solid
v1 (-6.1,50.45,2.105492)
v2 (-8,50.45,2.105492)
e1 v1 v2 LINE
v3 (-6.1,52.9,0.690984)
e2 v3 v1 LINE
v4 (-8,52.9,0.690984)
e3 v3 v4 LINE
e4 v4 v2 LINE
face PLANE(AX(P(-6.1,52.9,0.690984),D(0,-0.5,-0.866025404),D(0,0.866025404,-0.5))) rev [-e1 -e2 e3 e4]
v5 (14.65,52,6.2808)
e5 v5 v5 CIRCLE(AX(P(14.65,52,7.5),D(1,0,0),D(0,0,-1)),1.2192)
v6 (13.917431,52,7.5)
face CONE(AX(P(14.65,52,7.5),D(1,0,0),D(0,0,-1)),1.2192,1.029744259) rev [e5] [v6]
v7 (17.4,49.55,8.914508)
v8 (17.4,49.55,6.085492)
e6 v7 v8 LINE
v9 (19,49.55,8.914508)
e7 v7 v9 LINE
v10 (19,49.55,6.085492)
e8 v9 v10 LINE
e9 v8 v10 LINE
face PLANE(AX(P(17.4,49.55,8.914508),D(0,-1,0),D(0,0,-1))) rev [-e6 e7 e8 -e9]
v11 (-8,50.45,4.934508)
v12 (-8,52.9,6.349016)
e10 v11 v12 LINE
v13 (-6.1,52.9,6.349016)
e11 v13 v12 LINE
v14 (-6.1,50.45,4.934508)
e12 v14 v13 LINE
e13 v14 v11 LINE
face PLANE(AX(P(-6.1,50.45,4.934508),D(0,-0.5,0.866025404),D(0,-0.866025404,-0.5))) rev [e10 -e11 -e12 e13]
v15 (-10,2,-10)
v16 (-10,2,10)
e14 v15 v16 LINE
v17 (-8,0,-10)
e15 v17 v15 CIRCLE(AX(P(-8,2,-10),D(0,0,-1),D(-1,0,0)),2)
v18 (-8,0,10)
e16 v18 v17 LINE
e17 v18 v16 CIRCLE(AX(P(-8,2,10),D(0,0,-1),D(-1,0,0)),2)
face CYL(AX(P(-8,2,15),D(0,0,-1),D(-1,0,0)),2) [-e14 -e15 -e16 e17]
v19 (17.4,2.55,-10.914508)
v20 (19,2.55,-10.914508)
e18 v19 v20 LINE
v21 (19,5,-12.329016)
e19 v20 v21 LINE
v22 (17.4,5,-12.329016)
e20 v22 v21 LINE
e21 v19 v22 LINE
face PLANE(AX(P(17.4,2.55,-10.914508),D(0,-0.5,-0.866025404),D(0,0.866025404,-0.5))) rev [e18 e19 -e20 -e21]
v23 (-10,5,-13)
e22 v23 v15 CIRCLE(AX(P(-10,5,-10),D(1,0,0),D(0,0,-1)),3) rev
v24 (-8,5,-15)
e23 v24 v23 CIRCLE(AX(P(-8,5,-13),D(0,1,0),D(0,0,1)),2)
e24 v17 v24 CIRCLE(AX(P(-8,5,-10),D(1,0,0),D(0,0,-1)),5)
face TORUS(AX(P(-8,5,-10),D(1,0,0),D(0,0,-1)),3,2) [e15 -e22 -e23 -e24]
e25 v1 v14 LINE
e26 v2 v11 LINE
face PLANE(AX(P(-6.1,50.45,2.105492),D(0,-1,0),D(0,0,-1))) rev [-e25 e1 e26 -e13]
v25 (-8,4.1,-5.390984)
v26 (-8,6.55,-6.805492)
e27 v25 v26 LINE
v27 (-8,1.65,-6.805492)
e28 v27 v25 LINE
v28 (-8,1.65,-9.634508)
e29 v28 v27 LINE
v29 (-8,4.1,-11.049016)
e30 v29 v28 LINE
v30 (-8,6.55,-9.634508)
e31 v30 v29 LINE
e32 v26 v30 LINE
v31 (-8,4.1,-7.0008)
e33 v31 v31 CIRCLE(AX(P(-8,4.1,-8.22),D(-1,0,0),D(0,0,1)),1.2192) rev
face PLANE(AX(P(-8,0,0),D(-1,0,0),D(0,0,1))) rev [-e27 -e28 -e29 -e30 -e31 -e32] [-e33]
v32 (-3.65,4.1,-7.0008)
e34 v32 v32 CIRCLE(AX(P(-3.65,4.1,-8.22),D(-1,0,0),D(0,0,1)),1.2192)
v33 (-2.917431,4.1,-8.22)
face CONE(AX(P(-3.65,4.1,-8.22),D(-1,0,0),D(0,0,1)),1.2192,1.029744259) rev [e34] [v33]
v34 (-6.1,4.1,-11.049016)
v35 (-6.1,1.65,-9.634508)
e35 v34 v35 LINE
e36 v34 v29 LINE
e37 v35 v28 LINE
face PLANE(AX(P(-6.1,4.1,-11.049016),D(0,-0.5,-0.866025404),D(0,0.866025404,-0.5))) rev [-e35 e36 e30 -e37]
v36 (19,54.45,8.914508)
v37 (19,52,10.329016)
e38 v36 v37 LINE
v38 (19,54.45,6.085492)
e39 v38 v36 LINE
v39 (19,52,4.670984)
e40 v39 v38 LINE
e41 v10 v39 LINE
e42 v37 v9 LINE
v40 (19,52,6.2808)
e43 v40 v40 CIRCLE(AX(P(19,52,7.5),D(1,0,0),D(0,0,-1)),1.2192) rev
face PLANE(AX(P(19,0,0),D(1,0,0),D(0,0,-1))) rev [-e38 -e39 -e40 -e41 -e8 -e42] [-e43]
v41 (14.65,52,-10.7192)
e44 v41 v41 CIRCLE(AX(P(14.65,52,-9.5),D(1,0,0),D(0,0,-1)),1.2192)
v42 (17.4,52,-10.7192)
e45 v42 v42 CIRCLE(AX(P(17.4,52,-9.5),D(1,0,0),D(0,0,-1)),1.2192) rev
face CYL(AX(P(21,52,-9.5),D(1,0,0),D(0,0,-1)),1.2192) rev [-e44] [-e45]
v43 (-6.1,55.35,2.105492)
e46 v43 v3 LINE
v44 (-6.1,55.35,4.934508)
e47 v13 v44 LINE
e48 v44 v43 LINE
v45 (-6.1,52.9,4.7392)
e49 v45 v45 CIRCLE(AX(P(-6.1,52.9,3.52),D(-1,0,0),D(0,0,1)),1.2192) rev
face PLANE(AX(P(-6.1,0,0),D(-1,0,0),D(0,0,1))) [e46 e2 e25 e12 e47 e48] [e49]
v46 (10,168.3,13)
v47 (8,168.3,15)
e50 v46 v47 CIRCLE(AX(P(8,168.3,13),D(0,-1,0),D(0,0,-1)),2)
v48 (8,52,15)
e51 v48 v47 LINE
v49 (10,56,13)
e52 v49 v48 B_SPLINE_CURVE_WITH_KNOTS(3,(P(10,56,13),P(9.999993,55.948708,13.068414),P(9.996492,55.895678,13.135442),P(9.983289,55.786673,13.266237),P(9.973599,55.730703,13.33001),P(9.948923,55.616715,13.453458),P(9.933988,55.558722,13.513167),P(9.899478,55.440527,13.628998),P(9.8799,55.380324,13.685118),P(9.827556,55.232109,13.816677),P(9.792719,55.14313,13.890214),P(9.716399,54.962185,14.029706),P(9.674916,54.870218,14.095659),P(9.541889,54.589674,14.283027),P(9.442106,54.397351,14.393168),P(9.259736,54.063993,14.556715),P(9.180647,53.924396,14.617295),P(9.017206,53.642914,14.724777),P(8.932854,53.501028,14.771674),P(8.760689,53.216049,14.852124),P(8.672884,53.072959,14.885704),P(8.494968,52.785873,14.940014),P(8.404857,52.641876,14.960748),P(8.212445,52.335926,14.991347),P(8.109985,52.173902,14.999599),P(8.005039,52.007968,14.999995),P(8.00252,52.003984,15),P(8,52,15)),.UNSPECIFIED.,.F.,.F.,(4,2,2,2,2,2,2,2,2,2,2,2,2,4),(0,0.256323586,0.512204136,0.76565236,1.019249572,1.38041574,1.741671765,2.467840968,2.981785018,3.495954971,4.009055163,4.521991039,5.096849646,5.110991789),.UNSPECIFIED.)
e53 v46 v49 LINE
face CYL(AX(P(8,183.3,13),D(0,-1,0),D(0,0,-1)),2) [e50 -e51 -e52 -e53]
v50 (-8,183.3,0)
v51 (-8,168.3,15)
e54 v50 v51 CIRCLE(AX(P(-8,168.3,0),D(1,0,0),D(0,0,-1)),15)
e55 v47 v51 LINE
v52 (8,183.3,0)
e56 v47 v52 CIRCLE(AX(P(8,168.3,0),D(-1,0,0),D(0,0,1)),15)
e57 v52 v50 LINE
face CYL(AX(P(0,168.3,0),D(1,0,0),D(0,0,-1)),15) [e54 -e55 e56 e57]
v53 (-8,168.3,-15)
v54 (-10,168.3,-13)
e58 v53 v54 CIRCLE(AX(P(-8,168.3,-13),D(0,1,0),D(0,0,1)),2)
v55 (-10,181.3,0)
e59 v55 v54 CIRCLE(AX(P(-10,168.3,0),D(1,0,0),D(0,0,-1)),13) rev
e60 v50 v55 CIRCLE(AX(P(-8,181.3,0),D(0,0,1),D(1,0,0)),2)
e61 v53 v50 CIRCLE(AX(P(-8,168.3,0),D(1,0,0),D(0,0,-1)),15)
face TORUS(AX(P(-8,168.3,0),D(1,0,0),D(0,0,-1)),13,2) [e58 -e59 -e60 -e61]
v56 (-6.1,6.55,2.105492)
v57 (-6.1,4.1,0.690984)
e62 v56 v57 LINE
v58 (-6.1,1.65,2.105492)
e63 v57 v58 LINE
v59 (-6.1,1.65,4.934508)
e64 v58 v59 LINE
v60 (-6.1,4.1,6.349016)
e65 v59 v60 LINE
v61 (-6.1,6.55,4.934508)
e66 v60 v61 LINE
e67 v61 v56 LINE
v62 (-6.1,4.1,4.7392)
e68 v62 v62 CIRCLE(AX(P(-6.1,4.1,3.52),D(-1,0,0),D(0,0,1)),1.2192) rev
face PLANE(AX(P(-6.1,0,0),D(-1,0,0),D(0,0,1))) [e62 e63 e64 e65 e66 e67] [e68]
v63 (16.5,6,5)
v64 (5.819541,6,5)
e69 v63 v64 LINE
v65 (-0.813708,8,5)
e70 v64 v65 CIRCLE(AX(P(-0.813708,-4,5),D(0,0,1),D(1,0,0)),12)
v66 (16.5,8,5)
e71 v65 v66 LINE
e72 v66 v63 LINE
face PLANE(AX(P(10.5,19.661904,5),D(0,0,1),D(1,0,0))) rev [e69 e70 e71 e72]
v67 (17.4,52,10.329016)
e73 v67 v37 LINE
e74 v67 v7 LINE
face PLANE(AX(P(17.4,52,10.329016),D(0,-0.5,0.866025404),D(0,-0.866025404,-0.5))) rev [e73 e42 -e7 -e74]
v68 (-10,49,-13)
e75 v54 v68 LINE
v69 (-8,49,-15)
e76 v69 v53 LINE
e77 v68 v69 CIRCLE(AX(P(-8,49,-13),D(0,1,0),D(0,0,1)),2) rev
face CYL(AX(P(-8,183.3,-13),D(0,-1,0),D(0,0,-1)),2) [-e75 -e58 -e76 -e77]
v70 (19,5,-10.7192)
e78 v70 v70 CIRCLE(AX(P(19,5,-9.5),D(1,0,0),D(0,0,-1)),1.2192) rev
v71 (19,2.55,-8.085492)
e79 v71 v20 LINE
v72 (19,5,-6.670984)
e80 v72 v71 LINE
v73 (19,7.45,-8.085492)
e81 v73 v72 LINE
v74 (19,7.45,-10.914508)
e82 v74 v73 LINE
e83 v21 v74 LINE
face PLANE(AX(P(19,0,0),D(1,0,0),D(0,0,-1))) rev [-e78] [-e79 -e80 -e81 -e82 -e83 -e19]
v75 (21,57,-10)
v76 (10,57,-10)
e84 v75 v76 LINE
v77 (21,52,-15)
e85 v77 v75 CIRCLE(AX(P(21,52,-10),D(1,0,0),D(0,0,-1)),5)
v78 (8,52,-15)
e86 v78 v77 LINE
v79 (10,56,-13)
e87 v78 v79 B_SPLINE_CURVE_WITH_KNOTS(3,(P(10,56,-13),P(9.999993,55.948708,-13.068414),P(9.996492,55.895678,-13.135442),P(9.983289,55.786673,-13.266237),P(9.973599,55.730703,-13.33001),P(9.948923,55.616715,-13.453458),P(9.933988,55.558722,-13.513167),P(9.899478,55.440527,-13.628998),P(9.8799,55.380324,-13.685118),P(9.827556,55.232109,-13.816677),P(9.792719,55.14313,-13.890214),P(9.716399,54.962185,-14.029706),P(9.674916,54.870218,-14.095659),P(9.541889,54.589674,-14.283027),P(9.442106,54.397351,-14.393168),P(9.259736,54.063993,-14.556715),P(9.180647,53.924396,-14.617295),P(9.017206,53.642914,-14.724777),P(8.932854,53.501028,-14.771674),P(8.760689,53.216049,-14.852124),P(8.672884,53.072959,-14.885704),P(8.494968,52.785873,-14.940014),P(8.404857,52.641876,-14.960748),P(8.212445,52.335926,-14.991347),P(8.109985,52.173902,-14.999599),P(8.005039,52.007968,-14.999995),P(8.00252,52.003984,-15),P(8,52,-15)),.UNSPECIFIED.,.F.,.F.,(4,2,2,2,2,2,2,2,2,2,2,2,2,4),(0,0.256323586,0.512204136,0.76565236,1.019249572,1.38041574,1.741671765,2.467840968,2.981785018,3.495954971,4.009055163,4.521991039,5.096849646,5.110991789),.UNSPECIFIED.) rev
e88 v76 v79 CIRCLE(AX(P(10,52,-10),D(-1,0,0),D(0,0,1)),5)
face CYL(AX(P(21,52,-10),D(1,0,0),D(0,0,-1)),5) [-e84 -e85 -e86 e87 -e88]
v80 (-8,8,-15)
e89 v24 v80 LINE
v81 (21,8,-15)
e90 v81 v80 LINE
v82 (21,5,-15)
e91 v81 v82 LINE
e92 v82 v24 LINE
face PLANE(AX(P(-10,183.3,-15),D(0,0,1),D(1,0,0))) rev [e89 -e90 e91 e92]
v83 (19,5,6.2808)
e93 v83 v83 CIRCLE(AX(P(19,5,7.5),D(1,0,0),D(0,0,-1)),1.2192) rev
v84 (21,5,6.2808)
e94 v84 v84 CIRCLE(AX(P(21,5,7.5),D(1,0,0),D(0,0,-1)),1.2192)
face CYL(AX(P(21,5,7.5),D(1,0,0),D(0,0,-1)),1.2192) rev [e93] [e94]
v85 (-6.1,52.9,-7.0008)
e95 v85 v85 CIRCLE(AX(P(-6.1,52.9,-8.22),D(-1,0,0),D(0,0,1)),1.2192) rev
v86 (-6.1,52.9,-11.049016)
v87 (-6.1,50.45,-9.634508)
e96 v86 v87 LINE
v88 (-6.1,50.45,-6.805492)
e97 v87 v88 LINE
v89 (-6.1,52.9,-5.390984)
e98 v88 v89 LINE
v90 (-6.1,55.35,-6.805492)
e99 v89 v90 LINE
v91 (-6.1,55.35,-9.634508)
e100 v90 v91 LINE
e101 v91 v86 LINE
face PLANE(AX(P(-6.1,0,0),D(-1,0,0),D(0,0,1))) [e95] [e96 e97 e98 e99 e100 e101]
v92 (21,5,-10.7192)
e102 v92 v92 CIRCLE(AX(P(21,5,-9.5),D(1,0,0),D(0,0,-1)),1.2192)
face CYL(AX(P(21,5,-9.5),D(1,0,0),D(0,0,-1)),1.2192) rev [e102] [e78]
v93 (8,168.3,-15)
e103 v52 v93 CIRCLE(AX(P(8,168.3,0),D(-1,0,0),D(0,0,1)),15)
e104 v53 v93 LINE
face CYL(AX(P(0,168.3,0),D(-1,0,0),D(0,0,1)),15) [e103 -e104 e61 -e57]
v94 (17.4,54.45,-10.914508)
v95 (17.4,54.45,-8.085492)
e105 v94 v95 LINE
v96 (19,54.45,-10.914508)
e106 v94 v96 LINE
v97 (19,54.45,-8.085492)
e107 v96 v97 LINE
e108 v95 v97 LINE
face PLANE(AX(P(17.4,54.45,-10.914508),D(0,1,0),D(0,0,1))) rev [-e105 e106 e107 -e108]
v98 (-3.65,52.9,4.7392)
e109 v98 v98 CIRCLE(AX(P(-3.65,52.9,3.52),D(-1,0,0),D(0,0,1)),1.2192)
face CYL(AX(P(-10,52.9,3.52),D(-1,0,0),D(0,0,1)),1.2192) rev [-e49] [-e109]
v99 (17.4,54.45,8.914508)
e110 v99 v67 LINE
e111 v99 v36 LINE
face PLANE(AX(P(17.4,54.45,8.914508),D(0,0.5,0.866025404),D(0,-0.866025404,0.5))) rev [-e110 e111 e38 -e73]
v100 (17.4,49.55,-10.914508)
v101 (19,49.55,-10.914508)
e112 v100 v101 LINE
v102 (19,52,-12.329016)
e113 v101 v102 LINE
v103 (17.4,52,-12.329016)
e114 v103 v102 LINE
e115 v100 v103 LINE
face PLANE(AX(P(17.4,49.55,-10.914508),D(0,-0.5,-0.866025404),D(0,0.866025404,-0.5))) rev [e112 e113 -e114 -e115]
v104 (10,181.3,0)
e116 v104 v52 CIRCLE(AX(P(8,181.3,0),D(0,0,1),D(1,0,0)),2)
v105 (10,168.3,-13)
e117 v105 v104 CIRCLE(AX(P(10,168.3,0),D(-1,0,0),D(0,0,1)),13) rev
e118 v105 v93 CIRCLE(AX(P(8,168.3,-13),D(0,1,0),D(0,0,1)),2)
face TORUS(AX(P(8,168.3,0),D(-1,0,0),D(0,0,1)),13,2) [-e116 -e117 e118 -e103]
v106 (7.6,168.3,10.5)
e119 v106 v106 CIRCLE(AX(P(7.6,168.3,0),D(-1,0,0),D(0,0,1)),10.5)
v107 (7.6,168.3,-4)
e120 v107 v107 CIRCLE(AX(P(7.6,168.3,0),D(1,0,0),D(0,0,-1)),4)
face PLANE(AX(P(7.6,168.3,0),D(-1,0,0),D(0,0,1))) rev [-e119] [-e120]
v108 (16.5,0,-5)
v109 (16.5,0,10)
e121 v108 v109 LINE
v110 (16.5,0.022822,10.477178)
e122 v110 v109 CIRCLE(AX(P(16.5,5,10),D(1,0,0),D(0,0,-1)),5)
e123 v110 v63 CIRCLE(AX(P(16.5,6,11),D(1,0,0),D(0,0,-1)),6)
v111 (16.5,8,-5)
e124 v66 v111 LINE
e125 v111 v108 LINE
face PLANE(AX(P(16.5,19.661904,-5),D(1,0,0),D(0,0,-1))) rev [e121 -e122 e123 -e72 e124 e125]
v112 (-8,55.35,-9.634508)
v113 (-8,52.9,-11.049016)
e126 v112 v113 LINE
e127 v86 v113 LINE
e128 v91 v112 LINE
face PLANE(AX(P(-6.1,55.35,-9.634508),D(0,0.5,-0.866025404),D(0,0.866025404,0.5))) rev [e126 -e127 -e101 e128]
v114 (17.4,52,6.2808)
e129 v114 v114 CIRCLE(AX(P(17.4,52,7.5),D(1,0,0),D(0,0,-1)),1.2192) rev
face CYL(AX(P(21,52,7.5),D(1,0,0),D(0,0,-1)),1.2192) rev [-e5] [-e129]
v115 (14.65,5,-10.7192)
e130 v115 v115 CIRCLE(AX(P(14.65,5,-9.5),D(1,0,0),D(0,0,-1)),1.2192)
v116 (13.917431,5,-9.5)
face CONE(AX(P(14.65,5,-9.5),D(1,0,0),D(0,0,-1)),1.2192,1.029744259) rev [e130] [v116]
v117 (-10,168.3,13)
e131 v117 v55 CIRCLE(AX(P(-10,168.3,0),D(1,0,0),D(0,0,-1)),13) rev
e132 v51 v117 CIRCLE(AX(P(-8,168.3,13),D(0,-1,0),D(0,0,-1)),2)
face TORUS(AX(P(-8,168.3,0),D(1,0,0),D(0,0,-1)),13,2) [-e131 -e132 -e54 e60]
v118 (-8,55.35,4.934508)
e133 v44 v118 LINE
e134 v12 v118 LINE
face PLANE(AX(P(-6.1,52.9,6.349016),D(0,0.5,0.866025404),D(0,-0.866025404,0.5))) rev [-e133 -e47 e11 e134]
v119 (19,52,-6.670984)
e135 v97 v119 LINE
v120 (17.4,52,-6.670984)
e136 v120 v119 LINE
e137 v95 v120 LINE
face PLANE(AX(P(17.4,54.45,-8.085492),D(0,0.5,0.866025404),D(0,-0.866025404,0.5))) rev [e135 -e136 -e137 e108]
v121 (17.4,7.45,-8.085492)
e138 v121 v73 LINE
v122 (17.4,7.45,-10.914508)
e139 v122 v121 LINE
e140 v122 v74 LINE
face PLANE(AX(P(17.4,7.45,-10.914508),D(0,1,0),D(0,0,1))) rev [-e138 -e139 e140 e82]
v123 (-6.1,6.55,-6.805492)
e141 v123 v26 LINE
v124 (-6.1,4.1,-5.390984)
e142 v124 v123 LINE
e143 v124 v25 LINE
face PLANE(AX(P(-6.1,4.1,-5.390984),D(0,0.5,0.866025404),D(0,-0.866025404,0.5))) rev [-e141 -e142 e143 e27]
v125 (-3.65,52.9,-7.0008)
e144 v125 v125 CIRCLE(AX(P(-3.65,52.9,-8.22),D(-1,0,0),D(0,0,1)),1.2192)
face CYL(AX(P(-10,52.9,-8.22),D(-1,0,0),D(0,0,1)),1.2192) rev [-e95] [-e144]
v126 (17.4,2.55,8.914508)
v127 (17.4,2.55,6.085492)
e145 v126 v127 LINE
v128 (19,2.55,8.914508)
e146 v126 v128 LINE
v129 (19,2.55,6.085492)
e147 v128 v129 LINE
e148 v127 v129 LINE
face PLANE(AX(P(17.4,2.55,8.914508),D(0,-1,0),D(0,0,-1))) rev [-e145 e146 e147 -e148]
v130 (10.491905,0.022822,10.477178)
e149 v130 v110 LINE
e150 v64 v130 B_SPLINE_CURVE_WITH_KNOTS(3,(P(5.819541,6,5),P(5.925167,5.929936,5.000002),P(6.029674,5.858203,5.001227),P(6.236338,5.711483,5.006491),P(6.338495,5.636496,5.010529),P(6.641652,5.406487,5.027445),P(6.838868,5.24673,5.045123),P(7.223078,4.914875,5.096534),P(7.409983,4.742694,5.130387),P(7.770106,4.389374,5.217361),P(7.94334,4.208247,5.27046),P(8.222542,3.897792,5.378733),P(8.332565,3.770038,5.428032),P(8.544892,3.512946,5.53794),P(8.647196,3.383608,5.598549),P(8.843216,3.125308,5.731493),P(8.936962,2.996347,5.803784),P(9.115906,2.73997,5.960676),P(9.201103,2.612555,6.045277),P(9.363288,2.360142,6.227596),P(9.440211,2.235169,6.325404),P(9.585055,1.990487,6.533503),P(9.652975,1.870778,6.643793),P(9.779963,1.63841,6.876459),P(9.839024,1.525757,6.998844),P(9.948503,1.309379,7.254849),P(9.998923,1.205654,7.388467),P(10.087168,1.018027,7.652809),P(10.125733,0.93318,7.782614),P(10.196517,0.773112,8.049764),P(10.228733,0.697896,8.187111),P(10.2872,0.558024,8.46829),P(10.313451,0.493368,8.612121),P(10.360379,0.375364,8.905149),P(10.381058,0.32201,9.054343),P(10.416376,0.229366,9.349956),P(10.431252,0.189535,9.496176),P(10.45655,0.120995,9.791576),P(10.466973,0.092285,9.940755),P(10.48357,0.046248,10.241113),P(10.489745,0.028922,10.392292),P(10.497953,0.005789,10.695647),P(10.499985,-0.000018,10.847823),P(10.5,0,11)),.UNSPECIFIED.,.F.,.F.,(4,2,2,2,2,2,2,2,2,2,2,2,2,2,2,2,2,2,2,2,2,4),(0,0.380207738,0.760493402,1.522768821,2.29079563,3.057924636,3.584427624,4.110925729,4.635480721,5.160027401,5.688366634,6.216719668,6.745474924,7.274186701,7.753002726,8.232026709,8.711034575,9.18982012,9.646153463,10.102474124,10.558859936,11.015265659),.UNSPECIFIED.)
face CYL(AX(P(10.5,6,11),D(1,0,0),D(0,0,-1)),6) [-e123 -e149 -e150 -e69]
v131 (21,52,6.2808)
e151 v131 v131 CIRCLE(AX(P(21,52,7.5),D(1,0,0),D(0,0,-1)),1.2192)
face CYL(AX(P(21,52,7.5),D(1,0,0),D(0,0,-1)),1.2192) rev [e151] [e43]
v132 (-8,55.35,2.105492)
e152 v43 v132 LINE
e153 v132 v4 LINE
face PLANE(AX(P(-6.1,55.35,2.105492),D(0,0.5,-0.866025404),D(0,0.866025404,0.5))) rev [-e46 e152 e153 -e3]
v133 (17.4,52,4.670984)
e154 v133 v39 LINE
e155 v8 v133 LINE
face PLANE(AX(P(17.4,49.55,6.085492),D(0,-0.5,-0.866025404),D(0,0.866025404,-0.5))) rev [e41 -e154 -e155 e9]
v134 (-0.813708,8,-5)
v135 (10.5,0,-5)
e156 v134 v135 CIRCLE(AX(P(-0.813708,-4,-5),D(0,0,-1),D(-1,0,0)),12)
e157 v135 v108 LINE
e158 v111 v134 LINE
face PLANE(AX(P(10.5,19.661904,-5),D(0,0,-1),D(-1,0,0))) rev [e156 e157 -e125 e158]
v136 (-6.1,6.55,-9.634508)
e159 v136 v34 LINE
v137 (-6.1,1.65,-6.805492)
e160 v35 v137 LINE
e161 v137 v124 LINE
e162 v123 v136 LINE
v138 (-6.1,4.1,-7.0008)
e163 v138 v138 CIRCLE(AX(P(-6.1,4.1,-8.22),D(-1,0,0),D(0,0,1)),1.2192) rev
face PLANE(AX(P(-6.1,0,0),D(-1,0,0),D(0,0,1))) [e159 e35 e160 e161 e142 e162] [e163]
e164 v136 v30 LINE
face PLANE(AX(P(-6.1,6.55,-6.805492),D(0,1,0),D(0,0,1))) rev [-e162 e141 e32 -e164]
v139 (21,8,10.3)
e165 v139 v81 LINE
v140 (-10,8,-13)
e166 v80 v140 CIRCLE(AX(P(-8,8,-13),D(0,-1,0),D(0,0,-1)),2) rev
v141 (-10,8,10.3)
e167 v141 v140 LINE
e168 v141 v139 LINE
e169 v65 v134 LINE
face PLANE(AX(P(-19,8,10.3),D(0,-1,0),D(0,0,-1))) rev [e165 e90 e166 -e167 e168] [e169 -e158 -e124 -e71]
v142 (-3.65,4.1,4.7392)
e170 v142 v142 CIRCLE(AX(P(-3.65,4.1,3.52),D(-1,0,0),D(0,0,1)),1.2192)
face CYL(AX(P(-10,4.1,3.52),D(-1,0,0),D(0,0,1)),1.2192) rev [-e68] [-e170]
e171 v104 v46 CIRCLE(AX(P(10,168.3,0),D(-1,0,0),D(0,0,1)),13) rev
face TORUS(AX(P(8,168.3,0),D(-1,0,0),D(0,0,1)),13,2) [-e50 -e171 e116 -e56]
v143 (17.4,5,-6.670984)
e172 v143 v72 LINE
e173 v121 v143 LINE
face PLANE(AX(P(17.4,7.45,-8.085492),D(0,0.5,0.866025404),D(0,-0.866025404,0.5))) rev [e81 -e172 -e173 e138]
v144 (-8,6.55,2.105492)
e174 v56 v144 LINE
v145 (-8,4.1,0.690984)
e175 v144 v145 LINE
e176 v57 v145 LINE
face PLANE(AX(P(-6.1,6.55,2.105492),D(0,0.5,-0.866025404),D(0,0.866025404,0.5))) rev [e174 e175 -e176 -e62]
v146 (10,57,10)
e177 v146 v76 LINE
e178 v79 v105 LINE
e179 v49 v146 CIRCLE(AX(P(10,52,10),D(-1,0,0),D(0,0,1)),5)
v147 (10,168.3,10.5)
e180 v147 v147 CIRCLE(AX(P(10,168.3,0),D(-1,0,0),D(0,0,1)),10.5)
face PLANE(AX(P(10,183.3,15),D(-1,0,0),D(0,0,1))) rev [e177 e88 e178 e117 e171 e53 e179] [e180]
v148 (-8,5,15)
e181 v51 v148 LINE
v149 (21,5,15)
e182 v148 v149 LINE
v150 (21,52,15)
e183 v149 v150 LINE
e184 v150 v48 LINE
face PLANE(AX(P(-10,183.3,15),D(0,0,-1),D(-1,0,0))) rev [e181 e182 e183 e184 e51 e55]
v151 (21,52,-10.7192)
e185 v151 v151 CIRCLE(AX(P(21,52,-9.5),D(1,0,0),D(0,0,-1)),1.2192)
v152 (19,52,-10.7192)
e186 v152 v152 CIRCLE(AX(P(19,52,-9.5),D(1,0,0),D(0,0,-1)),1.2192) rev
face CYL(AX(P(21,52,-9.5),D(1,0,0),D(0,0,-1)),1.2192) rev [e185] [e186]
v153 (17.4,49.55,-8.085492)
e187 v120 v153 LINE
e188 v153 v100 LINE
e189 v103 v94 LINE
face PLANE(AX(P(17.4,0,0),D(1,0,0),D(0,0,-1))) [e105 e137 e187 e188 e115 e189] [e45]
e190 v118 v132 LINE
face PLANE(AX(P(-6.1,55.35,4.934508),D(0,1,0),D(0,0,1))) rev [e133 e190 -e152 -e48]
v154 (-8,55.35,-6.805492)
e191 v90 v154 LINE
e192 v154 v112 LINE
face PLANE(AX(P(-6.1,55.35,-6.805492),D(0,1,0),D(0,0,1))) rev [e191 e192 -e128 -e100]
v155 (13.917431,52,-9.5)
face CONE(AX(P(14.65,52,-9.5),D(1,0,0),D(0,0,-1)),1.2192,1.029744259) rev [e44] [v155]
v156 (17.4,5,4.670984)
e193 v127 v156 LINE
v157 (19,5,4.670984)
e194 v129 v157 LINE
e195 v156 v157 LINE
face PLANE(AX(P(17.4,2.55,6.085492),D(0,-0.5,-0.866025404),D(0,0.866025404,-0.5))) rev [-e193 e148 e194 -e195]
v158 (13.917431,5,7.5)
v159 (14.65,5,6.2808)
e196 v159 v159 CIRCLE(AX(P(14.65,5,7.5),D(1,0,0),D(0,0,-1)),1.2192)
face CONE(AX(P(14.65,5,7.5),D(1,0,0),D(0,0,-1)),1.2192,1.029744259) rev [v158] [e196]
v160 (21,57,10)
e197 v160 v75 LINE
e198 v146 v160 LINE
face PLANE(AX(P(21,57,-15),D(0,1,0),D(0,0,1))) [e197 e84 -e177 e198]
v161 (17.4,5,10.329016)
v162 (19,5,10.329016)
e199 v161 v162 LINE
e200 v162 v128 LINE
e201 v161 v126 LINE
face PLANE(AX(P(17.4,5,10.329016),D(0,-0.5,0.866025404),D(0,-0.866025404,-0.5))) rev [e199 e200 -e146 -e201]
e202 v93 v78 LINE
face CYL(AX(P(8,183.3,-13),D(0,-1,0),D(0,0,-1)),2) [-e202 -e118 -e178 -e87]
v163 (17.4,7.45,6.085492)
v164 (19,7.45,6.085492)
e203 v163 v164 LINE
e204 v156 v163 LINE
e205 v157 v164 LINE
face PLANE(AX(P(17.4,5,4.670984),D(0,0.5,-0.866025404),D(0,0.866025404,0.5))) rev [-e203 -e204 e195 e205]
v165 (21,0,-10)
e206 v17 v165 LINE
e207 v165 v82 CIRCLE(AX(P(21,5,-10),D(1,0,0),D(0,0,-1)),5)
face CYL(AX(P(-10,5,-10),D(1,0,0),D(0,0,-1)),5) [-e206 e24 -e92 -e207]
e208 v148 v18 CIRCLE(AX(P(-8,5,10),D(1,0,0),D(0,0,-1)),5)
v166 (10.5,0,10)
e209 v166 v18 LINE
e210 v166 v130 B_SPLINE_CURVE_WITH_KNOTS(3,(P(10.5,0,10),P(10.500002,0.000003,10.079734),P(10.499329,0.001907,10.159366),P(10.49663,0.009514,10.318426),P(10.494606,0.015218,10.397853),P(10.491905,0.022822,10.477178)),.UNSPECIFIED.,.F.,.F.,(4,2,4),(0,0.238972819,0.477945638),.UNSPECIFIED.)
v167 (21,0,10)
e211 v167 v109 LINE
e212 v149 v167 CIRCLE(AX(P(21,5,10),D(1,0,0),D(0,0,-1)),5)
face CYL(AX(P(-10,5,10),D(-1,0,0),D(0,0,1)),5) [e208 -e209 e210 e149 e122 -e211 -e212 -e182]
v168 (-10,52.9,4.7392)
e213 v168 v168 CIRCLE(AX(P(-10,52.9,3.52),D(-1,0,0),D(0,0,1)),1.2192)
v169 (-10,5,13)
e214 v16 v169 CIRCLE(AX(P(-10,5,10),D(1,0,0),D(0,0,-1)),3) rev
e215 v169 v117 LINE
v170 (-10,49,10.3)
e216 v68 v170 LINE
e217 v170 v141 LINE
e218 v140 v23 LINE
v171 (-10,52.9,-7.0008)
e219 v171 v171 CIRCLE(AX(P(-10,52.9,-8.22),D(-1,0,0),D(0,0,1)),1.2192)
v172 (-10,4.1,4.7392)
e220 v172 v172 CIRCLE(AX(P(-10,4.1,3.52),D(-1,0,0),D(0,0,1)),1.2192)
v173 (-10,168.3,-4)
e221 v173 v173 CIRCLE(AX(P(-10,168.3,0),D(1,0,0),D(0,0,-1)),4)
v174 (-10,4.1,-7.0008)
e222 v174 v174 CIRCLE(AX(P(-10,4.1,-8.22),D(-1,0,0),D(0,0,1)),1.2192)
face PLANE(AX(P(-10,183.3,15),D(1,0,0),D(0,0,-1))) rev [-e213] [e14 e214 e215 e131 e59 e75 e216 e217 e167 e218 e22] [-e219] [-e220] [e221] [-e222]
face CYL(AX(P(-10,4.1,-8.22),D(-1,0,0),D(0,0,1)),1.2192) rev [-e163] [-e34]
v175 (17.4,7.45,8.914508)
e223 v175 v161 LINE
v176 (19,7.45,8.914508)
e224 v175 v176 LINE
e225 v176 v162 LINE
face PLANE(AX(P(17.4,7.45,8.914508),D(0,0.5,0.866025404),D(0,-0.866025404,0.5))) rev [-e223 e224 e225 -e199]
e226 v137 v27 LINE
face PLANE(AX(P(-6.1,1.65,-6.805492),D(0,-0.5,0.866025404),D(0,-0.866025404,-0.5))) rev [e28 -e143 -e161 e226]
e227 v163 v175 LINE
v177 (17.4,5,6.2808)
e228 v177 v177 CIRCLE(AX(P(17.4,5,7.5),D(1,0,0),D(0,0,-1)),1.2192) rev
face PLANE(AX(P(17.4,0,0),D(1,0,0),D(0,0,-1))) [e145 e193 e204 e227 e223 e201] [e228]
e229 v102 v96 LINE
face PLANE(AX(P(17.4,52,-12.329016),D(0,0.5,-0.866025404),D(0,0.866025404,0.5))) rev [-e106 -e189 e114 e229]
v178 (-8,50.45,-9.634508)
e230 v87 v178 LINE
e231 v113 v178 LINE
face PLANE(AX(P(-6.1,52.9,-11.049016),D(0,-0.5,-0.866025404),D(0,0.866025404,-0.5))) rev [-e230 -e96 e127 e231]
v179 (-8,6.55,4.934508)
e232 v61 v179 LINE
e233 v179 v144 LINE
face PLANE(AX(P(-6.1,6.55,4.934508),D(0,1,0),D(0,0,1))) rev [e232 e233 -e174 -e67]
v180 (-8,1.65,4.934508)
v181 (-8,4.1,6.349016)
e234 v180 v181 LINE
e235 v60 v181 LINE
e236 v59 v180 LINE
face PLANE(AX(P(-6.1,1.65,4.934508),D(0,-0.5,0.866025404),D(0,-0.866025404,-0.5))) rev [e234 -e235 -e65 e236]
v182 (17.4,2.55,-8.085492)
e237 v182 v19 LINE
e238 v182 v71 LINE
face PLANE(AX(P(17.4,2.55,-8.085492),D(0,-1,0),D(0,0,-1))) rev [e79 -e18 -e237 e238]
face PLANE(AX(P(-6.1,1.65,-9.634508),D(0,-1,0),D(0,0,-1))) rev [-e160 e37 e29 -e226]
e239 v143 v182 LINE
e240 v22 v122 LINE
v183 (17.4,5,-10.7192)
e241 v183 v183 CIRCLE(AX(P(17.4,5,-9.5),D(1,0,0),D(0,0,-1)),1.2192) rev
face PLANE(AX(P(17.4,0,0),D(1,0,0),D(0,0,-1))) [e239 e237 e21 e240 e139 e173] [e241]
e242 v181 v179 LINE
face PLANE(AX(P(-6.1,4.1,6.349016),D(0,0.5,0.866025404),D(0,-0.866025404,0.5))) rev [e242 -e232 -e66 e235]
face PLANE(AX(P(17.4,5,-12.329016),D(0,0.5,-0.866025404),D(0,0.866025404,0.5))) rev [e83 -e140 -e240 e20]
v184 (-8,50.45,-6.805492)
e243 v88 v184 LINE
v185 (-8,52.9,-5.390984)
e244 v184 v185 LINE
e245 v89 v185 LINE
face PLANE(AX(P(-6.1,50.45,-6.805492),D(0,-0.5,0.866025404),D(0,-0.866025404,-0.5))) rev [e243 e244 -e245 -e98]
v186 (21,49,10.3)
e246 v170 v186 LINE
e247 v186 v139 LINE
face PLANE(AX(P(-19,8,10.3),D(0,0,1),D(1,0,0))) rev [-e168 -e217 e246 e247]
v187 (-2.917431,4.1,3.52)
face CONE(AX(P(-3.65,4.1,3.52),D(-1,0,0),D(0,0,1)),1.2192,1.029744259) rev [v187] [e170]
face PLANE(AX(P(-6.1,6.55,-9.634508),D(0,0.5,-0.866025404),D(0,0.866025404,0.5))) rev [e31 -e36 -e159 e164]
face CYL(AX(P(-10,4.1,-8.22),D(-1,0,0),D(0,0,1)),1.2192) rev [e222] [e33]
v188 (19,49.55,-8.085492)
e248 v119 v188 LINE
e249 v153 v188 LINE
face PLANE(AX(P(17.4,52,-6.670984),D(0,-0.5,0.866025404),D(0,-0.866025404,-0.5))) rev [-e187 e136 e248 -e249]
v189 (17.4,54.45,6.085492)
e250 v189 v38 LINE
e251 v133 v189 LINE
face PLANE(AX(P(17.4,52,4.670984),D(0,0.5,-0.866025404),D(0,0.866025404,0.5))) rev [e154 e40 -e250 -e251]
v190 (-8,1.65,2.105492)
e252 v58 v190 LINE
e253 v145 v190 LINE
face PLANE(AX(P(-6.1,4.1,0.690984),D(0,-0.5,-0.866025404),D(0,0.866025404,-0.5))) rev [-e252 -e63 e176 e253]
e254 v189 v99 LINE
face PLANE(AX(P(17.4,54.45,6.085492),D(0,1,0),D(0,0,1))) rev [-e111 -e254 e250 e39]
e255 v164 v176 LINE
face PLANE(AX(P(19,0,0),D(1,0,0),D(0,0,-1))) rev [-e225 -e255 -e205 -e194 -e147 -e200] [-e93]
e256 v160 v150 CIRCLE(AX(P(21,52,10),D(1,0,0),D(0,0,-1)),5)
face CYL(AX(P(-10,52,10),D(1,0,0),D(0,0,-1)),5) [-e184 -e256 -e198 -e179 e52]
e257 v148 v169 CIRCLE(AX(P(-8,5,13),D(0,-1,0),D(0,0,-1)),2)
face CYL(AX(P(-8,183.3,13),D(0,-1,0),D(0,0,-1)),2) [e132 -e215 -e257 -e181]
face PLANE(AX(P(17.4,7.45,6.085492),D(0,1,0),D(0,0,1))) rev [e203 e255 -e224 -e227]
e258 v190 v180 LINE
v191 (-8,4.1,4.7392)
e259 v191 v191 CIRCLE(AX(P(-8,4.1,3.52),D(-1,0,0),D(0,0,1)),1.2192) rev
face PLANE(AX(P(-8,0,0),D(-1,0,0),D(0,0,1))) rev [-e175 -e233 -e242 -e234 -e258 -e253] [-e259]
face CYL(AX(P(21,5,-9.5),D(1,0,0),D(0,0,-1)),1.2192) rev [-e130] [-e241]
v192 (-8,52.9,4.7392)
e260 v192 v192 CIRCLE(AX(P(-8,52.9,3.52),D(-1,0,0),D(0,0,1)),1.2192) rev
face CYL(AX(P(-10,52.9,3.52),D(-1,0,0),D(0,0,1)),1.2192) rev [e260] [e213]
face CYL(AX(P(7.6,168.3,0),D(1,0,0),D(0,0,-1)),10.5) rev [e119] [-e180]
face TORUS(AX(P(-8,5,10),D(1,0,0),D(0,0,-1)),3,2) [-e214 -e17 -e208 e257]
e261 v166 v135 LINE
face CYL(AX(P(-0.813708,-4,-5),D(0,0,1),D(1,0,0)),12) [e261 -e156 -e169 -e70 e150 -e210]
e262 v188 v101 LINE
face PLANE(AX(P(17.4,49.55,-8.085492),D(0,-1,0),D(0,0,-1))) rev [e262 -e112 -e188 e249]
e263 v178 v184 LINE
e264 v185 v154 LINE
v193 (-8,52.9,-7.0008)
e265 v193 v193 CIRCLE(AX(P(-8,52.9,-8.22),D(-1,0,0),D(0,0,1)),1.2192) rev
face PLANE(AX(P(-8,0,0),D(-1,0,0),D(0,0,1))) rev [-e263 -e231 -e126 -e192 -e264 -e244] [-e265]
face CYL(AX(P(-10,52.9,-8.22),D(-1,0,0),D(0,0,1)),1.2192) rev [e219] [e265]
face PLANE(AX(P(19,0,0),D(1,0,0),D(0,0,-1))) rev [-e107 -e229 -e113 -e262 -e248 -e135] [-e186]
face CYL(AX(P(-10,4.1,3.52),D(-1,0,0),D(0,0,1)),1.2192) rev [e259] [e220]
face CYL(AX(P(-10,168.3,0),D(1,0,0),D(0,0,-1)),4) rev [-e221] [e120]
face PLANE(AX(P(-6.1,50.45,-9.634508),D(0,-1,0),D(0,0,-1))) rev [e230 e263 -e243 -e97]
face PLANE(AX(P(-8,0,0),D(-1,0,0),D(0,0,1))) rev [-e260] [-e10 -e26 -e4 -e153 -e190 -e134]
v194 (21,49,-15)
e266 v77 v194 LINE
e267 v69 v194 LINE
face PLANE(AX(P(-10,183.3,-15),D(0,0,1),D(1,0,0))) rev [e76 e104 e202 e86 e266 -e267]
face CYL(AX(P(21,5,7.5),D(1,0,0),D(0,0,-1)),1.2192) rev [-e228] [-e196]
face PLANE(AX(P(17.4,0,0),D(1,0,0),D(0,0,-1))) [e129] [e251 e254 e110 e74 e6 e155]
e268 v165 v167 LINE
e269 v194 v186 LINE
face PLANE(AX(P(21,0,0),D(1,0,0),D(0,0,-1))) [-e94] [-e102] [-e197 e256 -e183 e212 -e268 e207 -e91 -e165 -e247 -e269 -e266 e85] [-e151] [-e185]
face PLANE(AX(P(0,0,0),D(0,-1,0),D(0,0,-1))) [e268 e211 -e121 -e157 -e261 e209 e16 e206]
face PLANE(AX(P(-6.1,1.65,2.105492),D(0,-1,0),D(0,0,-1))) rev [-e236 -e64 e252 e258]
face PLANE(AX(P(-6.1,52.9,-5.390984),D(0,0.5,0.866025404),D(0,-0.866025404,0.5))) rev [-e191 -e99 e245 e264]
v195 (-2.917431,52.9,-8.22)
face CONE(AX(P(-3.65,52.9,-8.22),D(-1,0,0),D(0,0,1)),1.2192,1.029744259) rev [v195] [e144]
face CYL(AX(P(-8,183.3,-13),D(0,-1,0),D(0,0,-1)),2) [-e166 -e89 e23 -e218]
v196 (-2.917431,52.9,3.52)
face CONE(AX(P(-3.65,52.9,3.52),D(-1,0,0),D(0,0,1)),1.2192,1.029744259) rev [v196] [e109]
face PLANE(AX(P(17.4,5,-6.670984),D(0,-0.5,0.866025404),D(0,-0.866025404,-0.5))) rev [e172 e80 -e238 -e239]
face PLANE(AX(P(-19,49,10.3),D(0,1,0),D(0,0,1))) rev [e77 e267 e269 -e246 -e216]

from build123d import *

# Parameters (mm, degrees)
SKETCH1_W                 = 20
SKETCH1_H                 = 30
BOSS_EXTRUDE1_DEPTH       = 183.3
SKETCH13_W                = 30
SKETCH13_H                = 57
BOSS_EXTRUDE2_DEPTH       = 11
SKETCH3_W                 = 20.6
SKETCH3_H                 = 41
CUT_EXTRUDE1_DEPTH        = 40
SKETCH11_R                = 10.5
CUT_EXTRUDE4_DEPTH        = 2.4
SKETCH12_R                = 4
CUT_EXTRUDE5_DEPTH        = 185.752943143
SKETCH14_W                = 31
SKETCH14_H                = 41
CUT_EXTRUDE6_DEPTH        = 25.3
F_2_CLEARANCE_HOLE2_D     = 2.4384
F_2_CLEARANCE_HOLE2_DEPTH = 6.35
F_2_CLEARANCE_HOLE2_TIP   = 0.732569267
CUT_EXTRUDE8_START        = -2
CUT_EXTRUDE8_DEPTH        = 1.6
F_2_CLEARANCE_HOLE3_D     = 2.4384
F_2_CLEARANCE_HOLE3_DEPTH = 6.35
F_2_CLEARANCE_HOLE3_TIP   = 0.732569267
FILLET3_R                 = 15
FILLET4_R                 = 5
FILLET5_R                 = 2
SKETCH21_W                = 6
SKETCH21_H                = 10
CUT_EXTRUDE9_DEPTH        = 8
FILLET6_R                 = 12
FILLET7_R                 = 6
CUT_EXTRUDE10_START       = -2
CUT_EXTRUDE10_DEPTH       = 1.9


# Some blends are built 0.0001 mm under size
with BuildPart() as part:
    # Sketch1 → Boss-Extrude1 (new body)
    with BuildSketch(Plane(origin=(0, 0, 0), x_dir=(1, 0, 0), z_dir=(0, 1, 0))):
        Rectangle(SKETCH1_W, SKETCH1_H)
    extrude(amount=BOSS_EXTRUDE1_DEPTH)

    # Sketch13 → Boss-Extrude2 (add)
    with BuildSketch(Plane.ZY.offset(-10)):
        with Locations((0, 28.5)):
            Rectangle(SKETCH13_W, SKETCH13_H)
    extrude(amount=-BOSS_EXTRUDE2_DEPTH)

    # Sketch3 → Cut-Extrude1 (cut)
    with BuildSketch(Plane(origin=(21, 0, 0), x_dir=(0, 0, -1), z_dir=(1, 0, 0))):
        with Locations((0, 28.5)):
            Rectangle(SKETCH3_W, SKETCH3_H)
    extrude(amount=-CUT_EXTRUDE1_DEPTH, mode=Mode.SUBTRACT)

    # Sketch11 → Cut-Extrude4 (cut)
    with BuildSketch(Plane.ZY.offset(-10)):
        with Locations((0, 168.3)):
            Circle(SKETCH11_R)
    extrude(amount=CUT_EXTRUDE4_DEPTH, mode=Mode.SUBTRACT)

    # Sketch12 → Cut-Extrude5 (cut, through all)
    with BuildSketch(Plane(origin=(7.6, 0, 0), x_dir=(0, 0, -1), z_dir=(1, 0, 0))):
        with Locations((0, 168.3)):
            Circle(SKETCH12_R)
    extrude(amount=-CUT_EXTRUDE5_DEPTH, mode=Mode.SUBTRACT)

    # Sketch14 → Cut-Extrude6 (cut)
    with BuildSketch(Plane(origin=(0, 0, -15), x_dir=(-1, 0, 0), z_dir=(0, 0, -1))):
        with Locations((-5.5, 28.5)):
            Rectangle(SKETCH14_W, SKETCH14_H)
    extrude(amount=-CUT_EXTRUDE6_DEPTH, mode=Mode.SUBTRACT)

    # #2 Clearance Hole2
    with Locations(Plane(origin=(21, 0, 0), x_dir=(0, 0, -1), z_dir=(1, 0, 0))):
        with Locations((-7.5, 5), (9.5, 5), (-7.5, 52), (9.5, 52)):
            Hole(F_2_CLEARANCE_HOLE2_D / 2, depth=F_2_CLEARANCE_HOLE2_DEPTH)
            with Locations((0, 0, -(F_2_CLEARANCE_HOLE2_DEPTH + F_2_CLEARANCE_HOLE2_TIP / 2))):  # 118° drill point
                Cone(0, F_2_CLEARANCE_HOLE2_D / 2, F_2_CLEARANCE_HOLE2_TIP, mode=Mode.SUBTRACT)

    # Sketch18 → Cut-Extrude8 (cut)
    with BuildSketch(Plane(origin=(21, 0, 0), x_dir=(0, 0, -1), z_dir=(1, 0, 0)).offset(CUT_EXTRUDE8_START)):
        Polygon((-10.329016319, 5), (-8.91450816, 2.55), (-6.08549184, 2.55), (-4.670983681, 5), (-6.08549184, 7.45), (-8.91450816, 7.45), align=None)
        Polygon((12.329016319, 5), (10.91450816, 7.45), (8.08549184, 7.45), (6.670983681, 5), (8.08549184, 2.55), (10.91450816, 2.55), align=None)
        Polygon((6.670983681, 52), (8.08549184, 49.55), (10.91450816, 49.55), (12.329016319, 52), (10.91450816, 54.45), (8.08549184, 54.45), align=None)
        Polygon((-4.670983681, 52), (-6.08549184, 54.45), (-8.91450816, 54.45), (-10.329016319, 52), (-8.91450816, 49.55), (-6.08549184, 49.55), align=None)
    extrude(amount=-CUT_EXTRUDE8_DEPTH, mode=Mode.SUBTRACT)

    # #2 Clearance Hole3
    with Locations(Plane(origin=(-10, 0, 0), x_dir=(0, 0, -1), z_dir=(-1, 0, 0))):
        with Locations((8.22, -4.1), (-3.52, -4.1), (-3.52, -52.9), (8.22, -52.9)):
            Hole(F_2_CLEARANCE_HOLE3_D / 2, depth=F_2_CLEARANCE_HOLE3_DEPTH)
            with Locations((0, 0, -(F_2_CLEARANCE_HOLE3_DEPTH + F_2_CLEARANCE_HOLE3_TIP / 2))):  # 118° drill point
                Cone(0, F_2_CLEARANCE_HOLE3_D / 2, F_2_CLEARANCE_HOLE3_TIP, mode=Mode.SUBTRACT)

    # Fillet3
    fillet3_edges = [part.edges().sort_by_distance(p)[0] for p in [
        (0, 183.3, 15),
        (0, 183.3, -15),
    ]]
    fillet(fillet3_edges, radius=FILLET3_R - 0.0001)  # a hair under: the kernel refuses the full size

    # Fillet4
    fillet4_edges = [part.edges().sort_by_distance(p)[0] for p in [
        (15.5, 57, -15),
        (15.5, 57, 15),
        (5.5, 0, -15),
        (5.5, 0, 15),
    ]]
    fillet(fillet4_edges, radius=FILLET4_R)

    # Fillet5
    fillet5_edges = [part.edges().sort_by_distance(p)[0] for p in [
        (10, 110.15005, 15),
        (10, 110.15005, -15),
        (10, 178.906631007, -10.606631007),
        (10, 178.906631007, 10.606631007),
        (-10, 86.65005, 15),
        (-10, 108.65005, -15),
        (-10, 178.906631007, -10.606631007),
        (-10, 178.906631007, 10.606631007),
        (-10, 0, 0),
        (-10, 1.464466094, -13.535533906),
        (-10, 1.464466094, 13.535533906),
        (-10, 6.5, -15),
    ]]
    fillet(fillet5_edges, radius=FILLET5_R)

    # Sketch21 → Cut-Extrude9 (cut)
    with BuildSketch(Plane.XZ):
        with Locations((13.5, 0)):
            Rectangle(SKETCH21_W, SKETCH21_H)
    extrude(amount=-CUT_EXTRUDE9_DEPTH, mode=Mode.SUBTRACT)

    # Fillet6
    # the kernel refuses this fillet: 12 mm, written as the material it takes off along each edge
    with BuildSketch(Plane(origin=(10.5, 8, 5), x_dir=(-1, 0, 0), z_dir=(0, 0, -1))) as fillet6_piece_1:
        with BuildLine():
            CenterArc((11.313708499, -12), FILLET6_R, 90, 70.528779366)
            Line((0, -8), (0, 0))
            Line((0, 0), (11.313708499, 0))
        make_face()
    extrude(amount=10, mode=Mode.SUBTRACT)

    # Fillet7
    # the kernel refuses this fillet: 6 mm, written as the material it takes off along each edge
    with BuildSketch(Plane(origin=(16.5, 0, 5), x_dir=(0, 1, 0), z_dir=(-1, 0, 0))) as fillet7_piece_1_section:
        with BuildLine():
            CenterArc((FILLET7_R, -FILLET7_R), FILLET7_R, 90, 90)
            Line((0, -FILLET7_R), (0, 0))
            Line((0, 0), (FILLET7_R, 0))
        make_face()
    fillet7_piece_1 = extrude(amount=21, mode=Mode.PRIVATE)
    fillet7_piece_1 = fillet7_piece_1 - Plane(origin=(-0.813708499, -4, 5.004149899), x_dir=(-1, 0, 0), z_dir=(0, 0, 1)) * Cylinder(12, 66, mode=Mode.PRIVATE)
    add(fillet7_piece_1, mode=Mode.SUBTRACT)

    # Sketch22 → Cut-Extrude10 (cut)
    with BuildSketch(Plane.ZY.offset(10).offset(CUT_EXTRUDE10_START)):
        Polygon((0.690983681, 52.9), (2.10549184, 50.45), (4.93450816, 50.45), (6.349016319, 52.9), (4.93450816, 55.35), (2.10549184, 55.35), align=None)
        Polygon((-11.049016319, 52.9), (-9.63450816, 50.45), (-6.80549184, 50.45), (-5.390983681, 52.9), (-6.80549184, 55.35), (-9.63450816, 55.35), align=None)
        Polygon((-5.390983681, 4.1), (-6.80549184, 6.55), (-9.63450816, 6.55), (-11.049016319, 4.1), (-9.63450816, 1.65), (-6.80549184, 1.65), align=None)
        Polygon((6.349016319, 4.1), (4.93450816, 6.55), (2.10549184, 6.55), (0.690983681, 4.1), (2.10549184, 1.65), (4.93450816, 1.65), align=None)
    extrude(amount=-CUT_EXTRUDE10_DEPTH, mode=Mode.SUBTRACT)


solid = part.part
